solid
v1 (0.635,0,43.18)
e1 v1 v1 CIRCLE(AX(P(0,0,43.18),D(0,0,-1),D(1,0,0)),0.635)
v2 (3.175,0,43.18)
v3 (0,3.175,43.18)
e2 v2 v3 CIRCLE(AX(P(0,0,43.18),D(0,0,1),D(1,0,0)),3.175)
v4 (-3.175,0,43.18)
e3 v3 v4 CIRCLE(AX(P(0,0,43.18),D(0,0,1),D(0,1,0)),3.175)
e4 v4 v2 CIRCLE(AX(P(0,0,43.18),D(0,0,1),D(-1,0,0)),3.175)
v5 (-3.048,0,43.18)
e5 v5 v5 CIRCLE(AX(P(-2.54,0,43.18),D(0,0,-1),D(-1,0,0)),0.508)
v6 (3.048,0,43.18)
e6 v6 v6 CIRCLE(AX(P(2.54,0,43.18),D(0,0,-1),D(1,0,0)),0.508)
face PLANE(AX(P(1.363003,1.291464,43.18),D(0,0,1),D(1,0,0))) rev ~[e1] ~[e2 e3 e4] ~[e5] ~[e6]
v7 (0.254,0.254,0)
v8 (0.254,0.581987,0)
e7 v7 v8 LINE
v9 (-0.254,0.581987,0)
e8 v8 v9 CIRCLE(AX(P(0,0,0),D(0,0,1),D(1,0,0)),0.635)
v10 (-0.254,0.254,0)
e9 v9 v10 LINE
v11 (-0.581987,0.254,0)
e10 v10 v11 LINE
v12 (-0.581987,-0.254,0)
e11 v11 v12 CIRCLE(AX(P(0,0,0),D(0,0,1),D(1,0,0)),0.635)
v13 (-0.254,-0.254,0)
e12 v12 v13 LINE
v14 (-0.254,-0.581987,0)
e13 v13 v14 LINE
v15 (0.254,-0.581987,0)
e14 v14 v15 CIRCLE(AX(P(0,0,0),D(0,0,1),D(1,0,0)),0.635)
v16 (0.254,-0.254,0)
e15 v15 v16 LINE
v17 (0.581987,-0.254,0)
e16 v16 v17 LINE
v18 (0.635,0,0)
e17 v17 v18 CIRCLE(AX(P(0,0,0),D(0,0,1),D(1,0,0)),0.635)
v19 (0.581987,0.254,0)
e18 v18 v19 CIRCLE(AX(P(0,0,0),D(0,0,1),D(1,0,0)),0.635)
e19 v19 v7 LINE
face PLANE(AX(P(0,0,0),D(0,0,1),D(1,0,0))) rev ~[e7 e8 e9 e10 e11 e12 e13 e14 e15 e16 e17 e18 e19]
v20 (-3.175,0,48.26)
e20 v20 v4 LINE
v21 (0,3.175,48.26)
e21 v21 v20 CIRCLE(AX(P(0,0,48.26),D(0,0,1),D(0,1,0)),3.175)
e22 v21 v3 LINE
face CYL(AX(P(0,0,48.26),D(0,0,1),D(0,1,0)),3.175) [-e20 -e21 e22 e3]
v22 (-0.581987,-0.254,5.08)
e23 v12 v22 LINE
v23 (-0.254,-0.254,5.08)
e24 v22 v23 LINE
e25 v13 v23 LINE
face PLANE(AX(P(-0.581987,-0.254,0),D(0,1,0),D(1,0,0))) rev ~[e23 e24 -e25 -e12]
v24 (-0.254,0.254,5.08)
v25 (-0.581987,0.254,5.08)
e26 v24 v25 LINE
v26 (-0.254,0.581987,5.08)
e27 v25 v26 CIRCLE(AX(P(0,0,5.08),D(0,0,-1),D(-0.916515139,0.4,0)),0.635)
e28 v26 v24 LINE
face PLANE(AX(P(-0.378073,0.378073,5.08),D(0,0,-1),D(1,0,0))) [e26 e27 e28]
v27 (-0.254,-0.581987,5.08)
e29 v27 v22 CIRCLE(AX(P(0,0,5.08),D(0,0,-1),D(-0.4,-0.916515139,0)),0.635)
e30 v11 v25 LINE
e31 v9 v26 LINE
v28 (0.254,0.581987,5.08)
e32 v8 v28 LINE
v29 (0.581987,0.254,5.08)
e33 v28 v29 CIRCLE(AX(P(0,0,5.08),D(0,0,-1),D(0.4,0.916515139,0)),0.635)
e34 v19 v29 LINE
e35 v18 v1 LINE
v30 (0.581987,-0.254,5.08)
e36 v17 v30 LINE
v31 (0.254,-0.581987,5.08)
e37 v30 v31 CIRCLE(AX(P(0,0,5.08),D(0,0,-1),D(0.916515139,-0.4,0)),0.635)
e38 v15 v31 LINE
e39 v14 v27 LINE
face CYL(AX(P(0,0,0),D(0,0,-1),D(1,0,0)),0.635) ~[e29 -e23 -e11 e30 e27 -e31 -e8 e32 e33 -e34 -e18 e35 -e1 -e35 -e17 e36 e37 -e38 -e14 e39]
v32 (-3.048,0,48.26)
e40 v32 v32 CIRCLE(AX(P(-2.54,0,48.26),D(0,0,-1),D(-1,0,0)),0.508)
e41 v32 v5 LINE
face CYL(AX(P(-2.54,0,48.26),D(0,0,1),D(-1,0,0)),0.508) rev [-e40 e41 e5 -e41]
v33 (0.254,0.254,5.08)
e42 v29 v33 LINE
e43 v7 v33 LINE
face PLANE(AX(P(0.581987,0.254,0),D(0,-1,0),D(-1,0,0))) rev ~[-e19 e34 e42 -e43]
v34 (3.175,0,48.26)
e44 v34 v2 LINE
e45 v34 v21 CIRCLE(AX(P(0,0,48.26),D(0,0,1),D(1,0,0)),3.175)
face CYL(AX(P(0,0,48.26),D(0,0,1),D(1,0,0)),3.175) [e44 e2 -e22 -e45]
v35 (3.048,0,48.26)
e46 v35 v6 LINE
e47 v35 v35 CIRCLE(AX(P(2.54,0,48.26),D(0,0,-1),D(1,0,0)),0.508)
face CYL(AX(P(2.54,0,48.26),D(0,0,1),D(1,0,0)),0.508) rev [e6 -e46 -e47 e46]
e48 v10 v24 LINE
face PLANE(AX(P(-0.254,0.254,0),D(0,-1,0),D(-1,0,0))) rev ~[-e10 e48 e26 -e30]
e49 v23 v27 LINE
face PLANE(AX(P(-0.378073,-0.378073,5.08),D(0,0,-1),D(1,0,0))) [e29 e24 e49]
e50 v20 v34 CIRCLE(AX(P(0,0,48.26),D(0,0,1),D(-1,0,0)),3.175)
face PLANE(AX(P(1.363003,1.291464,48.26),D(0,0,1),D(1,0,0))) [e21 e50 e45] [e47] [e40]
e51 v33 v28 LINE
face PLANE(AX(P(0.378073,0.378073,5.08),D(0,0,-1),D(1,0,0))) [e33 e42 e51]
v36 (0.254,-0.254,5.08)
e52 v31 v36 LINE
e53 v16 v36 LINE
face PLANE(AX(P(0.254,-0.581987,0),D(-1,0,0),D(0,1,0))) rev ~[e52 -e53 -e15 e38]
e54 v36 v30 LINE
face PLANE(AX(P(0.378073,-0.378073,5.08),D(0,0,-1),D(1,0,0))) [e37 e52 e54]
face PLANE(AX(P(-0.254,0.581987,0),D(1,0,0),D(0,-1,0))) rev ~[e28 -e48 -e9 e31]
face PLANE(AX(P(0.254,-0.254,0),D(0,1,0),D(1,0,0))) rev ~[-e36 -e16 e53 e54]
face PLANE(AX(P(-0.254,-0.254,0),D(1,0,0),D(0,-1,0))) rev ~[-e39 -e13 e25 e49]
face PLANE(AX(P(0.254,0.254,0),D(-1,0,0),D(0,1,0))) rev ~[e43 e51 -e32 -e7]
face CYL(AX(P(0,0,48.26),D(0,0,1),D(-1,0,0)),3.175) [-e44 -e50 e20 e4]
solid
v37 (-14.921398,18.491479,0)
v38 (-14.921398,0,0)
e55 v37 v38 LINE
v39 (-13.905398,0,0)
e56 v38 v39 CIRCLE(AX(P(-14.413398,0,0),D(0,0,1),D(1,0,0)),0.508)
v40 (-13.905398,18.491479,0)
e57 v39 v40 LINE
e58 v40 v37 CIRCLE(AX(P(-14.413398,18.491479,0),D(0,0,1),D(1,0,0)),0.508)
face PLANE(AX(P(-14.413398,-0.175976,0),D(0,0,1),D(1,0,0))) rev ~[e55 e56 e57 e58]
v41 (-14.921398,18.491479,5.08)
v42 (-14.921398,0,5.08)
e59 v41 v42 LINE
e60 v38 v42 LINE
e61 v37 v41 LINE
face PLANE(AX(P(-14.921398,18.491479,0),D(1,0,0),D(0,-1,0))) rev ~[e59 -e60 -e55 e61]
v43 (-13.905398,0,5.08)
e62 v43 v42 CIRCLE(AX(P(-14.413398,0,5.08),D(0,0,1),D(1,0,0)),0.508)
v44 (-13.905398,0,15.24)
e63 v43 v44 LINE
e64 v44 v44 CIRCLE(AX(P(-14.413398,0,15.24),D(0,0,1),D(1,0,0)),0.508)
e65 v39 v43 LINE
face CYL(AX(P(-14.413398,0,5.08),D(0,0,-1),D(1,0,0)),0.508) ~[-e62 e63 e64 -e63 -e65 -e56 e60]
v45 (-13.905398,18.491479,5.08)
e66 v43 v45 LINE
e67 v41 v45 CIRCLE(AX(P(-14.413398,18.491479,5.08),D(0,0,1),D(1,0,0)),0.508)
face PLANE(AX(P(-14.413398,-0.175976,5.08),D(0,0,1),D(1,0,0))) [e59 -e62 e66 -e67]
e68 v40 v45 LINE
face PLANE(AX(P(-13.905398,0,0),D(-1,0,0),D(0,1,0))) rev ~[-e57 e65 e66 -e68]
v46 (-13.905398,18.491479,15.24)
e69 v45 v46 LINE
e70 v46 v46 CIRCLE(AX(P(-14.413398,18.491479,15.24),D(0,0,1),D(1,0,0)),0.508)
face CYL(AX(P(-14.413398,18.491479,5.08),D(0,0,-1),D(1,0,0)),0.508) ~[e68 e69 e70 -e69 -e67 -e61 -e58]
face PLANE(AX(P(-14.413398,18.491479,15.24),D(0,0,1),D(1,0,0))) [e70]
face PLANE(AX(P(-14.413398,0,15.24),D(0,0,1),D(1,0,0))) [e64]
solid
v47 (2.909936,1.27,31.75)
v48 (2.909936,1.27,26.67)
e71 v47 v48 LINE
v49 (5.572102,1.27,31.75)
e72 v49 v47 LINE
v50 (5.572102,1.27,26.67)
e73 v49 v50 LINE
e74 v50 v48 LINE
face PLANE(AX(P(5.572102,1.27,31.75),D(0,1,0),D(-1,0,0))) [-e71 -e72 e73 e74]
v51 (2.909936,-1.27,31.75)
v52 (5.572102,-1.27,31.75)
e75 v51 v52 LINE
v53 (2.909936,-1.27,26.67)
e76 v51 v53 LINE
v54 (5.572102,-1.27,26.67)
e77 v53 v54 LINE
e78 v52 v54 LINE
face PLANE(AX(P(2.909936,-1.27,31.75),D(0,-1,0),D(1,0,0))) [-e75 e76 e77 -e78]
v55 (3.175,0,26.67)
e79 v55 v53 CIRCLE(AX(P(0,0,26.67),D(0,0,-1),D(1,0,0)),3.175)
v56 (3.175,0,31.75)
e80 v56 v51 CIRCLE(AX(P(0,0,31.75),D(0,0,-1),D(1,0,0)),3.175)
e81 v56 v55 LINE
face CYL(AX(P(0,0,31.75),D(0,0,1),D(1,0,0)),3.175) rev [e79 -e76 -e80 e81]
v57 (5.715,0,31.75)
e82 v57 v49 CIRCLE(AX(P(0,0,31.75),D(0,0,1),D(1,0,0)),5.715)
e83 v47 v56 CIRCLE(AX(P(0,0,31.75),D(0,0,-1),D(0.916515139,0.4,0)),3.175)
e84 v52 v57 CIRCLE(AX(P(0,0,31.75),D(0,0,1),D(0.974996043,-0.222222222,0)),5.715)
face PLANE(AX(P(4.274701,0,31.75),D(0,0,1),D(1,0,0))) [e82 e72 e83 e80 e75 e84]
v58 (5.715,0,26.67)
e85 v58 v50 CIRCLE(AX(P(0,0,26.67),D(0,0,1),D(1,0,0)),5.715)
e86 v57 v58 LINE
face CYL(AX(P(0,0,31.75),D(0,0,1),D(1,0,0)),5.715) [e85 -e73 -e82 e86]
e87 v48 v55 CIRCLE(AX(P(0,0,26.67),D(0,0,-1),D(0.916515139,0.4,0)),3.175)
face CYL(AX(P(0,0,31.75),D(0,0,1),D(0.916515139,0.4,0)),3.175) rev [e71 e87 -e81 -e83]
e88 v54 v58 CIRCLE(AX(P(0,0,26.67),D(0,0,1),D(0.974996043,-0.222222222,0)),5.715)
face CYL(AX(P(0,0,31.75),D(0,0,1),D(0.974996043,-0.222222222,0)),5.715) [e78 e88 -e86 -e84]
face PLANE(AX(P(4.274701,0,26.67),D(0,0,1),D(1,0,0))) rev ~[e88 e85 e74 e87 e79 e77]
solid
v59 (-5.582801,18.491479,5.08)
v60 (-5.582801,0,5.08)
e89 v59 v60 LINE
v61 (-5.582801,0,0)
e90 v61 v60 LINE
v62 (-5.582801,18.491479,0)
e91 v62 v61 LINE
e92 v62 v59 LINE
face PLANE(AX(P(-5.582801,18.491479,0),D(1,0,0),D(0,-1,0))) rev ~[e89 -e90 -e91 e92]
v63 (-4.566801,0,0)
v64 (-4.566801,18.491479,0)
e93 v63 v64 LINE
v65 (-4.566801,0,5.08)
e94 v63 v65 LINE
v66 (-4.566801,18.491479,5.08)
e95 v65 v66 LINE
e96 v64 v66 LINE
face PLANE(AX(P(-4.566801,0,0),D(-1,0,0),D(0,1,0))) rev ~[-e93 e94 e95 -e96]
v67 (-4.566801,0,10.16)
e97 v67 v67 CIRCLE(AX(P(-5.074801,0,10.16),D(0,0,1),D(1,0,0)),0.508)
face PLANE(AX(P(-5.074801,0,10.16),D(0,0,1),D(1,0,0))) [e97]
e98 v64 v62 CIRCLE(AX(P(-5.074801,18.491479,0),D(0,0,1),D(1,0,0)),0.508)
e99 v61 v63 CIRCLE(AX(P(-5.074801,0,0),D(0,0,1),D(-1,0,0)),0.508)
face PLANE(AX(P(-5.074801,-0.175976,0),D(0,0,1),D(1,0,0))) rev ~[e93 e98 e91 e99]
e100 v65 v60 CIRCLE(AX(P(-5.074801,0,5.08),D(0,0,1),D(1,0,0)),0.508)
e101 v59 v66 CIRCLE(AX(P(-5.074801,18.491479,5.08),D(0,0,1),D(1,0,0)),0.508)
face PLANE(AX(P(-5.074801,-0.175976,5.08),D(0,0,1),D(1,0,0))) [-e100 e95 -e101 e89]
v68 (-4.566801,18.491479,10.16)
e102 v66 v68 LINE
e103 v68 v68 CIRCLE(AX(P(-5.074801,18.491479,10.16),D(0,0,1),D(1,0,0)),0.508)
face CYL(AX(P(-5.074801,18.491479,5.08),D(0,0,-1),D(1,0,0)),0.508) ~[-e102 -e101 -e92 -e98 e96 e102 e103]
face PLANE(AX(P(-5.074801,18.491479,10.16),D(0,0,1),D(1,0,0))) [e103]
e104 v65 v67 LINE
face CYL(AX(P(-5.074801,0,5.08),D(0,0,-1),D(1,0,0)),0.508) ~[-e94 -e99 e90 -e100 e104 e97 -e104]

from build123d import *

# Parameters (mm, degrees)
F0_R      = 0.635
F1_DEPTH  = 48.26
F3_DEPTH  = 5.08
F5_DEPTH  = 5.08
F6_R      = 0.508
F7_DEPTH  = 5.08
F8_R      = 0.508
F9_DEPTH  = 10.16
F12_DEPTH = 5.08
F14_DEPTH = 5.08


with BuildPart() as f1:
    # F0 (on Top) → F1 (new body)
    with BuildSketch(Plane.XY):
        Circle(F0_R)
    extrude(amount=F1_DEPTH)

    # F2 (on face) → F3 (join)
    with BuildSketch(Plane.XY.offset(48.26)):
        with BuildLine():
            Line((3.048, 0), (3.175, 0))
            ThreePointArc((3.175, 0), (2.2450640303, 2.2450640303), (0, 3.175))
            Line((0, 3.175), (0, 0))
            Line((0, 0), (2.032, 0))
            ThreePointArc((2.032, 0), (2.54, 0.508), (3.048, 0))
        make_face()
        with BuildLine():
            ThreePointArc((-3.175, 0), (0, -3.175), (3.175, 0))
            Line((3.175, 0), (3.048, 0))
            ThreePointArc((3.048, 0), (2.54, -0.508), (2.032, 0))
            Line((2.032, 0), (0, 0))
            Line((0, 0), (-2.032, 0))
            ThreePointArc((-2.032, 0), (-2.54, -0.508), (-3.048, 0))
            Line((-3.048, 0), (-3.175, 0))
        make_face()
        with BuildLine():
            Line((0, 0), (0, 3.175))
            ThreePointArc((0, 3.175), (-2.2450640303, 2.2450640303), (-3.175, 0))
            Line((-3.175, 0), (-3.048, 0))
            ThreePointArc((-3.048, 0), (-2.54, 0.508), (-2.032, 0))
            Line((-2.032, 0), (0, 0))
        make_face()
    extrude(amount=-F3_DEPTH)

    # F13 (on face) → F14 (cut)
    with BuildSketch(Plane(origin=(0, 0, 0), x_dir=(1, 0, 0), z_dir=(0, 0, -1))):
        with BuildLine():
            Line((0.254, 0.254), (0.5819871133, 0.254))
            ThreePointArc((0.5819871133, 0.254), (0.4490128061, 0.4490128061), (0.254, 0.5819871133))
            Line((0.254, 0.5819871133), (0.254, 0.254))
        make_face()
        with BuildLine():
            ThreePointArc((0.254, -0.5819871133), (0.4490128061, -0.4490128061), (0.5819871133, -0.254))
            Line((0.5819871133, -0.254), (0.254, -0.254))
            Line((0.254, -0.254), (0.254, -0.5819871133))
        make_face()
        with BuildLine():
            ThreePointArc((-0.254, 0.5819871133), (0, 0.635), (0.254, 0.5819871133))
            Line((0.254, 0.5819871133), (0.254, 4.8890965991))
            Line((0.254, 4.8890965991), (-0.254, 4.8890965991))
            Line((-0.254, 4.8890965991), (-0.254, 0.5819871133))
        make_face()
        with BuildLine():
            Line((0.254, -4.8890965991), (0.254, -0.5819871133))
            ThreePointArc((0.254, -0.5819871133), (0, -0.635), (-0.254, -0.5819871133))
            Line((-0.254, -0.5819871133), (-0.254, -4.8890965991))
            Line((-0.254, -4.8890965991), (0.254, -4.8890965991))
        make_face()
        with BuildLine():
            Line((-0.254, 0.254), (-0.254, 0.5819871133))
            ThreePointArc((-0.254, 0.5819871133), (-0.4490128061, 0.4490128061), (-0.5819871133, 0.254))
            Line((-0.5819871133, 0.254), (-0.254, 0.254))
        make_face()
        with BuildLine():
            ThreePointArc((-0.5819871133, -0.254), (-0.4490128061, -0.4490128061), (-0.254, -0.5819871133))
            Line((-0.254, -0.5819871133), (-0.254, -0.254))
            Line((-0.254, -0.254), (-0.5819871133, -0.254))
        make_face()
    extrude(amount=-F14_DEPTH, mode=Mode.SUBTRACT)


with BuildPart() as f5:
    # F4 (on Top) → F5 (new body)
    with BuildSketch(Plane.XY):
        with BuildLine():
            ThreePointArc((-5.5828010944, 0), (-5.0748010944, -0.508), (-4.5668010944, 0))
            Line((-4.5668010944, 0), (-5.5828010944, 0))
        make_face()
        with BuildLine():
            ThreePointArc((-5.5828010944, 0), (-5.0748010944, 0.508), (-4.5668010944, 0))
            Line((-4.5668010944, 0), (-4.5668010944, 18.4914791188))
            ThreePointArc((-4.5668010944, 18.4914791188), (-5.0748010944, 17.9834791188), (-5.5828010944, 18.4914791188))
            Line((-5.5828010944, 18.4914791188), (-5.5828010944, 0))
        make_face()
        with BuildLine():
            Line((-5.5828010944, 0), (-4.5668010944, 0))
            ThreePointArc((-4.5668010944, 0), (-5.0748010944, 0.508), (-5.5828010944, 0))
        make_face()
        with BuildLine():
            ThreePointArc((-5.5828010944, 18.4914791188), (-5.0748010944, 17.9834791188), (-4.5668010944, 18.4914791188))
            Line((-4.5668010944, 18.4914791188), (-5.5828010944, 18.4914791188))
        make_face()
        with BuildLine():
            Line((-5.5828010944, 18.4914791188), (-4.5668010944, 18.4914791188))
            ThreePointArc((-4.5668010944, 18.4914791188), (-5.0748010944, 18.9994791188), (-5.5828010944, 18.4914791188))
        make_face()
    extrude(amount=F5_DEPTH)

    # F6 (on face) → F7 (join)
    with BuildSketch(Plane.XY.offset(5.08)):
        with Locations((-5.0748010944, 18.4914791188)):
            Circle(F6_R)
        with Locations((-5.0748010944, 0)):
            Circle(F6_R)
    extrude(amount=F7_DEPTH)


with BuildPart() as f5b:
    # F4 (on Top) → F5, piece 2 (new body)
    with BuildSketch(Plane.XY):
        with BuildLine():
            ThreePointArc((-14.9213979021, 0), (-14.4133979021, -0.508), (-13.9053979021, 0))
            Line((-13.9053979021, 0), (-14.4133979021, 0))
            Line((-14.4133979021, 0), (-14.9213979021, 0))
        make_face()
        with BuildLine():
            Line((-14.4133979021, 0), (-13.9053979021, 0))
            ThreePointArc((-13.9053979021, 0), (-14.4133979021, 0.508), (-14.9213979021, 0))
            Line((-14.9213979021, 0), (-14.4133979021, 0))
        make_face()
        with BuildLine():
            ThreePointArc((-14.9213979021, 0), (-14.4133979021, 0.508), (-13.9053979021, 0))
            Line((-13.9053979021, 0), (-13.9053979021, 18.4914791188))
            ThreePointArc((-13.9053979021, 18.4914791188), (-14.4133979021, 17.9834791188), (-14.9213979021, 18.4914791188))
            Line((-14.9213979021, 18.4914791188), (-14.9213979021, 0))
        make_face()
        with BuildLine():
            ThreePointArc((-14.9213979021, 18.4914791188), (-14.4133979021, 17.9834791188), (-13.9053979021, 18.4914791188))
            Line((-13.9053979021, 18.4914791188), (-14.9213979021, 18.4914791188))
        make_face()
        with BuildLine():
            Line((-14.9213979021, 18.4914791188), (-13.9053979021, 18.4914791188))
            ThreePointArc((-13.9053979021, 18.4914791188), (-14.4133979021, 18.9994791188), (-14.9213979021, 18.4914791188))
        make_face()
    extrude(amount=F5_DEPTH)

    # F8 (on face) → F9 (join)
    with BuildSketch(Plane.XY.offset(5.08)):
        with Locations((-14.4133979021, 18.4914791188)):
            Circle(F8_R)
        with Locations((-14.4133979021, 0)):
            Circle(F8_R)
    extrude(amount=F9_DEPTH)


with BuildPart() as f12:
    # F11 (on offset) → F12 (new body)
    with BuildSketch(Plane.XY.offset(31.75)):
        with BuildLine():
            ThreePointArc((2.9099355663, 1.27), (3.1080275436, 0.6486831187), (3.175, 0))
            ThreePointArc((3.175, 0), (3.1080275436, -0.6486831187), (2.9099355663, -1.27))
            Line((2.9099355663, -1.27), (5.572102386, -1.27))
            Line((5.572102386, -1.27), (5.572102386, 1.27))
            Line((5.572102386, 1.27), (2.9099355663, 1.27))
        make_face()
        with BuildLine():
            ThreePointArc((5.715, 0), (5.6791632366, 0.639006989), (5.572102386, 1.27))
            Line((5.572102386, 1.27), (5.572102386, -1.27))
            ThreePointArc((5.572102386, -1.27), (5.6791632366, -0.639006989), (5.715, 0))
        make_face()
    extrude(amount=-F12_DEPTH)


solid = Compound([f1.part, f5.part, f5b.part, f12.part])
